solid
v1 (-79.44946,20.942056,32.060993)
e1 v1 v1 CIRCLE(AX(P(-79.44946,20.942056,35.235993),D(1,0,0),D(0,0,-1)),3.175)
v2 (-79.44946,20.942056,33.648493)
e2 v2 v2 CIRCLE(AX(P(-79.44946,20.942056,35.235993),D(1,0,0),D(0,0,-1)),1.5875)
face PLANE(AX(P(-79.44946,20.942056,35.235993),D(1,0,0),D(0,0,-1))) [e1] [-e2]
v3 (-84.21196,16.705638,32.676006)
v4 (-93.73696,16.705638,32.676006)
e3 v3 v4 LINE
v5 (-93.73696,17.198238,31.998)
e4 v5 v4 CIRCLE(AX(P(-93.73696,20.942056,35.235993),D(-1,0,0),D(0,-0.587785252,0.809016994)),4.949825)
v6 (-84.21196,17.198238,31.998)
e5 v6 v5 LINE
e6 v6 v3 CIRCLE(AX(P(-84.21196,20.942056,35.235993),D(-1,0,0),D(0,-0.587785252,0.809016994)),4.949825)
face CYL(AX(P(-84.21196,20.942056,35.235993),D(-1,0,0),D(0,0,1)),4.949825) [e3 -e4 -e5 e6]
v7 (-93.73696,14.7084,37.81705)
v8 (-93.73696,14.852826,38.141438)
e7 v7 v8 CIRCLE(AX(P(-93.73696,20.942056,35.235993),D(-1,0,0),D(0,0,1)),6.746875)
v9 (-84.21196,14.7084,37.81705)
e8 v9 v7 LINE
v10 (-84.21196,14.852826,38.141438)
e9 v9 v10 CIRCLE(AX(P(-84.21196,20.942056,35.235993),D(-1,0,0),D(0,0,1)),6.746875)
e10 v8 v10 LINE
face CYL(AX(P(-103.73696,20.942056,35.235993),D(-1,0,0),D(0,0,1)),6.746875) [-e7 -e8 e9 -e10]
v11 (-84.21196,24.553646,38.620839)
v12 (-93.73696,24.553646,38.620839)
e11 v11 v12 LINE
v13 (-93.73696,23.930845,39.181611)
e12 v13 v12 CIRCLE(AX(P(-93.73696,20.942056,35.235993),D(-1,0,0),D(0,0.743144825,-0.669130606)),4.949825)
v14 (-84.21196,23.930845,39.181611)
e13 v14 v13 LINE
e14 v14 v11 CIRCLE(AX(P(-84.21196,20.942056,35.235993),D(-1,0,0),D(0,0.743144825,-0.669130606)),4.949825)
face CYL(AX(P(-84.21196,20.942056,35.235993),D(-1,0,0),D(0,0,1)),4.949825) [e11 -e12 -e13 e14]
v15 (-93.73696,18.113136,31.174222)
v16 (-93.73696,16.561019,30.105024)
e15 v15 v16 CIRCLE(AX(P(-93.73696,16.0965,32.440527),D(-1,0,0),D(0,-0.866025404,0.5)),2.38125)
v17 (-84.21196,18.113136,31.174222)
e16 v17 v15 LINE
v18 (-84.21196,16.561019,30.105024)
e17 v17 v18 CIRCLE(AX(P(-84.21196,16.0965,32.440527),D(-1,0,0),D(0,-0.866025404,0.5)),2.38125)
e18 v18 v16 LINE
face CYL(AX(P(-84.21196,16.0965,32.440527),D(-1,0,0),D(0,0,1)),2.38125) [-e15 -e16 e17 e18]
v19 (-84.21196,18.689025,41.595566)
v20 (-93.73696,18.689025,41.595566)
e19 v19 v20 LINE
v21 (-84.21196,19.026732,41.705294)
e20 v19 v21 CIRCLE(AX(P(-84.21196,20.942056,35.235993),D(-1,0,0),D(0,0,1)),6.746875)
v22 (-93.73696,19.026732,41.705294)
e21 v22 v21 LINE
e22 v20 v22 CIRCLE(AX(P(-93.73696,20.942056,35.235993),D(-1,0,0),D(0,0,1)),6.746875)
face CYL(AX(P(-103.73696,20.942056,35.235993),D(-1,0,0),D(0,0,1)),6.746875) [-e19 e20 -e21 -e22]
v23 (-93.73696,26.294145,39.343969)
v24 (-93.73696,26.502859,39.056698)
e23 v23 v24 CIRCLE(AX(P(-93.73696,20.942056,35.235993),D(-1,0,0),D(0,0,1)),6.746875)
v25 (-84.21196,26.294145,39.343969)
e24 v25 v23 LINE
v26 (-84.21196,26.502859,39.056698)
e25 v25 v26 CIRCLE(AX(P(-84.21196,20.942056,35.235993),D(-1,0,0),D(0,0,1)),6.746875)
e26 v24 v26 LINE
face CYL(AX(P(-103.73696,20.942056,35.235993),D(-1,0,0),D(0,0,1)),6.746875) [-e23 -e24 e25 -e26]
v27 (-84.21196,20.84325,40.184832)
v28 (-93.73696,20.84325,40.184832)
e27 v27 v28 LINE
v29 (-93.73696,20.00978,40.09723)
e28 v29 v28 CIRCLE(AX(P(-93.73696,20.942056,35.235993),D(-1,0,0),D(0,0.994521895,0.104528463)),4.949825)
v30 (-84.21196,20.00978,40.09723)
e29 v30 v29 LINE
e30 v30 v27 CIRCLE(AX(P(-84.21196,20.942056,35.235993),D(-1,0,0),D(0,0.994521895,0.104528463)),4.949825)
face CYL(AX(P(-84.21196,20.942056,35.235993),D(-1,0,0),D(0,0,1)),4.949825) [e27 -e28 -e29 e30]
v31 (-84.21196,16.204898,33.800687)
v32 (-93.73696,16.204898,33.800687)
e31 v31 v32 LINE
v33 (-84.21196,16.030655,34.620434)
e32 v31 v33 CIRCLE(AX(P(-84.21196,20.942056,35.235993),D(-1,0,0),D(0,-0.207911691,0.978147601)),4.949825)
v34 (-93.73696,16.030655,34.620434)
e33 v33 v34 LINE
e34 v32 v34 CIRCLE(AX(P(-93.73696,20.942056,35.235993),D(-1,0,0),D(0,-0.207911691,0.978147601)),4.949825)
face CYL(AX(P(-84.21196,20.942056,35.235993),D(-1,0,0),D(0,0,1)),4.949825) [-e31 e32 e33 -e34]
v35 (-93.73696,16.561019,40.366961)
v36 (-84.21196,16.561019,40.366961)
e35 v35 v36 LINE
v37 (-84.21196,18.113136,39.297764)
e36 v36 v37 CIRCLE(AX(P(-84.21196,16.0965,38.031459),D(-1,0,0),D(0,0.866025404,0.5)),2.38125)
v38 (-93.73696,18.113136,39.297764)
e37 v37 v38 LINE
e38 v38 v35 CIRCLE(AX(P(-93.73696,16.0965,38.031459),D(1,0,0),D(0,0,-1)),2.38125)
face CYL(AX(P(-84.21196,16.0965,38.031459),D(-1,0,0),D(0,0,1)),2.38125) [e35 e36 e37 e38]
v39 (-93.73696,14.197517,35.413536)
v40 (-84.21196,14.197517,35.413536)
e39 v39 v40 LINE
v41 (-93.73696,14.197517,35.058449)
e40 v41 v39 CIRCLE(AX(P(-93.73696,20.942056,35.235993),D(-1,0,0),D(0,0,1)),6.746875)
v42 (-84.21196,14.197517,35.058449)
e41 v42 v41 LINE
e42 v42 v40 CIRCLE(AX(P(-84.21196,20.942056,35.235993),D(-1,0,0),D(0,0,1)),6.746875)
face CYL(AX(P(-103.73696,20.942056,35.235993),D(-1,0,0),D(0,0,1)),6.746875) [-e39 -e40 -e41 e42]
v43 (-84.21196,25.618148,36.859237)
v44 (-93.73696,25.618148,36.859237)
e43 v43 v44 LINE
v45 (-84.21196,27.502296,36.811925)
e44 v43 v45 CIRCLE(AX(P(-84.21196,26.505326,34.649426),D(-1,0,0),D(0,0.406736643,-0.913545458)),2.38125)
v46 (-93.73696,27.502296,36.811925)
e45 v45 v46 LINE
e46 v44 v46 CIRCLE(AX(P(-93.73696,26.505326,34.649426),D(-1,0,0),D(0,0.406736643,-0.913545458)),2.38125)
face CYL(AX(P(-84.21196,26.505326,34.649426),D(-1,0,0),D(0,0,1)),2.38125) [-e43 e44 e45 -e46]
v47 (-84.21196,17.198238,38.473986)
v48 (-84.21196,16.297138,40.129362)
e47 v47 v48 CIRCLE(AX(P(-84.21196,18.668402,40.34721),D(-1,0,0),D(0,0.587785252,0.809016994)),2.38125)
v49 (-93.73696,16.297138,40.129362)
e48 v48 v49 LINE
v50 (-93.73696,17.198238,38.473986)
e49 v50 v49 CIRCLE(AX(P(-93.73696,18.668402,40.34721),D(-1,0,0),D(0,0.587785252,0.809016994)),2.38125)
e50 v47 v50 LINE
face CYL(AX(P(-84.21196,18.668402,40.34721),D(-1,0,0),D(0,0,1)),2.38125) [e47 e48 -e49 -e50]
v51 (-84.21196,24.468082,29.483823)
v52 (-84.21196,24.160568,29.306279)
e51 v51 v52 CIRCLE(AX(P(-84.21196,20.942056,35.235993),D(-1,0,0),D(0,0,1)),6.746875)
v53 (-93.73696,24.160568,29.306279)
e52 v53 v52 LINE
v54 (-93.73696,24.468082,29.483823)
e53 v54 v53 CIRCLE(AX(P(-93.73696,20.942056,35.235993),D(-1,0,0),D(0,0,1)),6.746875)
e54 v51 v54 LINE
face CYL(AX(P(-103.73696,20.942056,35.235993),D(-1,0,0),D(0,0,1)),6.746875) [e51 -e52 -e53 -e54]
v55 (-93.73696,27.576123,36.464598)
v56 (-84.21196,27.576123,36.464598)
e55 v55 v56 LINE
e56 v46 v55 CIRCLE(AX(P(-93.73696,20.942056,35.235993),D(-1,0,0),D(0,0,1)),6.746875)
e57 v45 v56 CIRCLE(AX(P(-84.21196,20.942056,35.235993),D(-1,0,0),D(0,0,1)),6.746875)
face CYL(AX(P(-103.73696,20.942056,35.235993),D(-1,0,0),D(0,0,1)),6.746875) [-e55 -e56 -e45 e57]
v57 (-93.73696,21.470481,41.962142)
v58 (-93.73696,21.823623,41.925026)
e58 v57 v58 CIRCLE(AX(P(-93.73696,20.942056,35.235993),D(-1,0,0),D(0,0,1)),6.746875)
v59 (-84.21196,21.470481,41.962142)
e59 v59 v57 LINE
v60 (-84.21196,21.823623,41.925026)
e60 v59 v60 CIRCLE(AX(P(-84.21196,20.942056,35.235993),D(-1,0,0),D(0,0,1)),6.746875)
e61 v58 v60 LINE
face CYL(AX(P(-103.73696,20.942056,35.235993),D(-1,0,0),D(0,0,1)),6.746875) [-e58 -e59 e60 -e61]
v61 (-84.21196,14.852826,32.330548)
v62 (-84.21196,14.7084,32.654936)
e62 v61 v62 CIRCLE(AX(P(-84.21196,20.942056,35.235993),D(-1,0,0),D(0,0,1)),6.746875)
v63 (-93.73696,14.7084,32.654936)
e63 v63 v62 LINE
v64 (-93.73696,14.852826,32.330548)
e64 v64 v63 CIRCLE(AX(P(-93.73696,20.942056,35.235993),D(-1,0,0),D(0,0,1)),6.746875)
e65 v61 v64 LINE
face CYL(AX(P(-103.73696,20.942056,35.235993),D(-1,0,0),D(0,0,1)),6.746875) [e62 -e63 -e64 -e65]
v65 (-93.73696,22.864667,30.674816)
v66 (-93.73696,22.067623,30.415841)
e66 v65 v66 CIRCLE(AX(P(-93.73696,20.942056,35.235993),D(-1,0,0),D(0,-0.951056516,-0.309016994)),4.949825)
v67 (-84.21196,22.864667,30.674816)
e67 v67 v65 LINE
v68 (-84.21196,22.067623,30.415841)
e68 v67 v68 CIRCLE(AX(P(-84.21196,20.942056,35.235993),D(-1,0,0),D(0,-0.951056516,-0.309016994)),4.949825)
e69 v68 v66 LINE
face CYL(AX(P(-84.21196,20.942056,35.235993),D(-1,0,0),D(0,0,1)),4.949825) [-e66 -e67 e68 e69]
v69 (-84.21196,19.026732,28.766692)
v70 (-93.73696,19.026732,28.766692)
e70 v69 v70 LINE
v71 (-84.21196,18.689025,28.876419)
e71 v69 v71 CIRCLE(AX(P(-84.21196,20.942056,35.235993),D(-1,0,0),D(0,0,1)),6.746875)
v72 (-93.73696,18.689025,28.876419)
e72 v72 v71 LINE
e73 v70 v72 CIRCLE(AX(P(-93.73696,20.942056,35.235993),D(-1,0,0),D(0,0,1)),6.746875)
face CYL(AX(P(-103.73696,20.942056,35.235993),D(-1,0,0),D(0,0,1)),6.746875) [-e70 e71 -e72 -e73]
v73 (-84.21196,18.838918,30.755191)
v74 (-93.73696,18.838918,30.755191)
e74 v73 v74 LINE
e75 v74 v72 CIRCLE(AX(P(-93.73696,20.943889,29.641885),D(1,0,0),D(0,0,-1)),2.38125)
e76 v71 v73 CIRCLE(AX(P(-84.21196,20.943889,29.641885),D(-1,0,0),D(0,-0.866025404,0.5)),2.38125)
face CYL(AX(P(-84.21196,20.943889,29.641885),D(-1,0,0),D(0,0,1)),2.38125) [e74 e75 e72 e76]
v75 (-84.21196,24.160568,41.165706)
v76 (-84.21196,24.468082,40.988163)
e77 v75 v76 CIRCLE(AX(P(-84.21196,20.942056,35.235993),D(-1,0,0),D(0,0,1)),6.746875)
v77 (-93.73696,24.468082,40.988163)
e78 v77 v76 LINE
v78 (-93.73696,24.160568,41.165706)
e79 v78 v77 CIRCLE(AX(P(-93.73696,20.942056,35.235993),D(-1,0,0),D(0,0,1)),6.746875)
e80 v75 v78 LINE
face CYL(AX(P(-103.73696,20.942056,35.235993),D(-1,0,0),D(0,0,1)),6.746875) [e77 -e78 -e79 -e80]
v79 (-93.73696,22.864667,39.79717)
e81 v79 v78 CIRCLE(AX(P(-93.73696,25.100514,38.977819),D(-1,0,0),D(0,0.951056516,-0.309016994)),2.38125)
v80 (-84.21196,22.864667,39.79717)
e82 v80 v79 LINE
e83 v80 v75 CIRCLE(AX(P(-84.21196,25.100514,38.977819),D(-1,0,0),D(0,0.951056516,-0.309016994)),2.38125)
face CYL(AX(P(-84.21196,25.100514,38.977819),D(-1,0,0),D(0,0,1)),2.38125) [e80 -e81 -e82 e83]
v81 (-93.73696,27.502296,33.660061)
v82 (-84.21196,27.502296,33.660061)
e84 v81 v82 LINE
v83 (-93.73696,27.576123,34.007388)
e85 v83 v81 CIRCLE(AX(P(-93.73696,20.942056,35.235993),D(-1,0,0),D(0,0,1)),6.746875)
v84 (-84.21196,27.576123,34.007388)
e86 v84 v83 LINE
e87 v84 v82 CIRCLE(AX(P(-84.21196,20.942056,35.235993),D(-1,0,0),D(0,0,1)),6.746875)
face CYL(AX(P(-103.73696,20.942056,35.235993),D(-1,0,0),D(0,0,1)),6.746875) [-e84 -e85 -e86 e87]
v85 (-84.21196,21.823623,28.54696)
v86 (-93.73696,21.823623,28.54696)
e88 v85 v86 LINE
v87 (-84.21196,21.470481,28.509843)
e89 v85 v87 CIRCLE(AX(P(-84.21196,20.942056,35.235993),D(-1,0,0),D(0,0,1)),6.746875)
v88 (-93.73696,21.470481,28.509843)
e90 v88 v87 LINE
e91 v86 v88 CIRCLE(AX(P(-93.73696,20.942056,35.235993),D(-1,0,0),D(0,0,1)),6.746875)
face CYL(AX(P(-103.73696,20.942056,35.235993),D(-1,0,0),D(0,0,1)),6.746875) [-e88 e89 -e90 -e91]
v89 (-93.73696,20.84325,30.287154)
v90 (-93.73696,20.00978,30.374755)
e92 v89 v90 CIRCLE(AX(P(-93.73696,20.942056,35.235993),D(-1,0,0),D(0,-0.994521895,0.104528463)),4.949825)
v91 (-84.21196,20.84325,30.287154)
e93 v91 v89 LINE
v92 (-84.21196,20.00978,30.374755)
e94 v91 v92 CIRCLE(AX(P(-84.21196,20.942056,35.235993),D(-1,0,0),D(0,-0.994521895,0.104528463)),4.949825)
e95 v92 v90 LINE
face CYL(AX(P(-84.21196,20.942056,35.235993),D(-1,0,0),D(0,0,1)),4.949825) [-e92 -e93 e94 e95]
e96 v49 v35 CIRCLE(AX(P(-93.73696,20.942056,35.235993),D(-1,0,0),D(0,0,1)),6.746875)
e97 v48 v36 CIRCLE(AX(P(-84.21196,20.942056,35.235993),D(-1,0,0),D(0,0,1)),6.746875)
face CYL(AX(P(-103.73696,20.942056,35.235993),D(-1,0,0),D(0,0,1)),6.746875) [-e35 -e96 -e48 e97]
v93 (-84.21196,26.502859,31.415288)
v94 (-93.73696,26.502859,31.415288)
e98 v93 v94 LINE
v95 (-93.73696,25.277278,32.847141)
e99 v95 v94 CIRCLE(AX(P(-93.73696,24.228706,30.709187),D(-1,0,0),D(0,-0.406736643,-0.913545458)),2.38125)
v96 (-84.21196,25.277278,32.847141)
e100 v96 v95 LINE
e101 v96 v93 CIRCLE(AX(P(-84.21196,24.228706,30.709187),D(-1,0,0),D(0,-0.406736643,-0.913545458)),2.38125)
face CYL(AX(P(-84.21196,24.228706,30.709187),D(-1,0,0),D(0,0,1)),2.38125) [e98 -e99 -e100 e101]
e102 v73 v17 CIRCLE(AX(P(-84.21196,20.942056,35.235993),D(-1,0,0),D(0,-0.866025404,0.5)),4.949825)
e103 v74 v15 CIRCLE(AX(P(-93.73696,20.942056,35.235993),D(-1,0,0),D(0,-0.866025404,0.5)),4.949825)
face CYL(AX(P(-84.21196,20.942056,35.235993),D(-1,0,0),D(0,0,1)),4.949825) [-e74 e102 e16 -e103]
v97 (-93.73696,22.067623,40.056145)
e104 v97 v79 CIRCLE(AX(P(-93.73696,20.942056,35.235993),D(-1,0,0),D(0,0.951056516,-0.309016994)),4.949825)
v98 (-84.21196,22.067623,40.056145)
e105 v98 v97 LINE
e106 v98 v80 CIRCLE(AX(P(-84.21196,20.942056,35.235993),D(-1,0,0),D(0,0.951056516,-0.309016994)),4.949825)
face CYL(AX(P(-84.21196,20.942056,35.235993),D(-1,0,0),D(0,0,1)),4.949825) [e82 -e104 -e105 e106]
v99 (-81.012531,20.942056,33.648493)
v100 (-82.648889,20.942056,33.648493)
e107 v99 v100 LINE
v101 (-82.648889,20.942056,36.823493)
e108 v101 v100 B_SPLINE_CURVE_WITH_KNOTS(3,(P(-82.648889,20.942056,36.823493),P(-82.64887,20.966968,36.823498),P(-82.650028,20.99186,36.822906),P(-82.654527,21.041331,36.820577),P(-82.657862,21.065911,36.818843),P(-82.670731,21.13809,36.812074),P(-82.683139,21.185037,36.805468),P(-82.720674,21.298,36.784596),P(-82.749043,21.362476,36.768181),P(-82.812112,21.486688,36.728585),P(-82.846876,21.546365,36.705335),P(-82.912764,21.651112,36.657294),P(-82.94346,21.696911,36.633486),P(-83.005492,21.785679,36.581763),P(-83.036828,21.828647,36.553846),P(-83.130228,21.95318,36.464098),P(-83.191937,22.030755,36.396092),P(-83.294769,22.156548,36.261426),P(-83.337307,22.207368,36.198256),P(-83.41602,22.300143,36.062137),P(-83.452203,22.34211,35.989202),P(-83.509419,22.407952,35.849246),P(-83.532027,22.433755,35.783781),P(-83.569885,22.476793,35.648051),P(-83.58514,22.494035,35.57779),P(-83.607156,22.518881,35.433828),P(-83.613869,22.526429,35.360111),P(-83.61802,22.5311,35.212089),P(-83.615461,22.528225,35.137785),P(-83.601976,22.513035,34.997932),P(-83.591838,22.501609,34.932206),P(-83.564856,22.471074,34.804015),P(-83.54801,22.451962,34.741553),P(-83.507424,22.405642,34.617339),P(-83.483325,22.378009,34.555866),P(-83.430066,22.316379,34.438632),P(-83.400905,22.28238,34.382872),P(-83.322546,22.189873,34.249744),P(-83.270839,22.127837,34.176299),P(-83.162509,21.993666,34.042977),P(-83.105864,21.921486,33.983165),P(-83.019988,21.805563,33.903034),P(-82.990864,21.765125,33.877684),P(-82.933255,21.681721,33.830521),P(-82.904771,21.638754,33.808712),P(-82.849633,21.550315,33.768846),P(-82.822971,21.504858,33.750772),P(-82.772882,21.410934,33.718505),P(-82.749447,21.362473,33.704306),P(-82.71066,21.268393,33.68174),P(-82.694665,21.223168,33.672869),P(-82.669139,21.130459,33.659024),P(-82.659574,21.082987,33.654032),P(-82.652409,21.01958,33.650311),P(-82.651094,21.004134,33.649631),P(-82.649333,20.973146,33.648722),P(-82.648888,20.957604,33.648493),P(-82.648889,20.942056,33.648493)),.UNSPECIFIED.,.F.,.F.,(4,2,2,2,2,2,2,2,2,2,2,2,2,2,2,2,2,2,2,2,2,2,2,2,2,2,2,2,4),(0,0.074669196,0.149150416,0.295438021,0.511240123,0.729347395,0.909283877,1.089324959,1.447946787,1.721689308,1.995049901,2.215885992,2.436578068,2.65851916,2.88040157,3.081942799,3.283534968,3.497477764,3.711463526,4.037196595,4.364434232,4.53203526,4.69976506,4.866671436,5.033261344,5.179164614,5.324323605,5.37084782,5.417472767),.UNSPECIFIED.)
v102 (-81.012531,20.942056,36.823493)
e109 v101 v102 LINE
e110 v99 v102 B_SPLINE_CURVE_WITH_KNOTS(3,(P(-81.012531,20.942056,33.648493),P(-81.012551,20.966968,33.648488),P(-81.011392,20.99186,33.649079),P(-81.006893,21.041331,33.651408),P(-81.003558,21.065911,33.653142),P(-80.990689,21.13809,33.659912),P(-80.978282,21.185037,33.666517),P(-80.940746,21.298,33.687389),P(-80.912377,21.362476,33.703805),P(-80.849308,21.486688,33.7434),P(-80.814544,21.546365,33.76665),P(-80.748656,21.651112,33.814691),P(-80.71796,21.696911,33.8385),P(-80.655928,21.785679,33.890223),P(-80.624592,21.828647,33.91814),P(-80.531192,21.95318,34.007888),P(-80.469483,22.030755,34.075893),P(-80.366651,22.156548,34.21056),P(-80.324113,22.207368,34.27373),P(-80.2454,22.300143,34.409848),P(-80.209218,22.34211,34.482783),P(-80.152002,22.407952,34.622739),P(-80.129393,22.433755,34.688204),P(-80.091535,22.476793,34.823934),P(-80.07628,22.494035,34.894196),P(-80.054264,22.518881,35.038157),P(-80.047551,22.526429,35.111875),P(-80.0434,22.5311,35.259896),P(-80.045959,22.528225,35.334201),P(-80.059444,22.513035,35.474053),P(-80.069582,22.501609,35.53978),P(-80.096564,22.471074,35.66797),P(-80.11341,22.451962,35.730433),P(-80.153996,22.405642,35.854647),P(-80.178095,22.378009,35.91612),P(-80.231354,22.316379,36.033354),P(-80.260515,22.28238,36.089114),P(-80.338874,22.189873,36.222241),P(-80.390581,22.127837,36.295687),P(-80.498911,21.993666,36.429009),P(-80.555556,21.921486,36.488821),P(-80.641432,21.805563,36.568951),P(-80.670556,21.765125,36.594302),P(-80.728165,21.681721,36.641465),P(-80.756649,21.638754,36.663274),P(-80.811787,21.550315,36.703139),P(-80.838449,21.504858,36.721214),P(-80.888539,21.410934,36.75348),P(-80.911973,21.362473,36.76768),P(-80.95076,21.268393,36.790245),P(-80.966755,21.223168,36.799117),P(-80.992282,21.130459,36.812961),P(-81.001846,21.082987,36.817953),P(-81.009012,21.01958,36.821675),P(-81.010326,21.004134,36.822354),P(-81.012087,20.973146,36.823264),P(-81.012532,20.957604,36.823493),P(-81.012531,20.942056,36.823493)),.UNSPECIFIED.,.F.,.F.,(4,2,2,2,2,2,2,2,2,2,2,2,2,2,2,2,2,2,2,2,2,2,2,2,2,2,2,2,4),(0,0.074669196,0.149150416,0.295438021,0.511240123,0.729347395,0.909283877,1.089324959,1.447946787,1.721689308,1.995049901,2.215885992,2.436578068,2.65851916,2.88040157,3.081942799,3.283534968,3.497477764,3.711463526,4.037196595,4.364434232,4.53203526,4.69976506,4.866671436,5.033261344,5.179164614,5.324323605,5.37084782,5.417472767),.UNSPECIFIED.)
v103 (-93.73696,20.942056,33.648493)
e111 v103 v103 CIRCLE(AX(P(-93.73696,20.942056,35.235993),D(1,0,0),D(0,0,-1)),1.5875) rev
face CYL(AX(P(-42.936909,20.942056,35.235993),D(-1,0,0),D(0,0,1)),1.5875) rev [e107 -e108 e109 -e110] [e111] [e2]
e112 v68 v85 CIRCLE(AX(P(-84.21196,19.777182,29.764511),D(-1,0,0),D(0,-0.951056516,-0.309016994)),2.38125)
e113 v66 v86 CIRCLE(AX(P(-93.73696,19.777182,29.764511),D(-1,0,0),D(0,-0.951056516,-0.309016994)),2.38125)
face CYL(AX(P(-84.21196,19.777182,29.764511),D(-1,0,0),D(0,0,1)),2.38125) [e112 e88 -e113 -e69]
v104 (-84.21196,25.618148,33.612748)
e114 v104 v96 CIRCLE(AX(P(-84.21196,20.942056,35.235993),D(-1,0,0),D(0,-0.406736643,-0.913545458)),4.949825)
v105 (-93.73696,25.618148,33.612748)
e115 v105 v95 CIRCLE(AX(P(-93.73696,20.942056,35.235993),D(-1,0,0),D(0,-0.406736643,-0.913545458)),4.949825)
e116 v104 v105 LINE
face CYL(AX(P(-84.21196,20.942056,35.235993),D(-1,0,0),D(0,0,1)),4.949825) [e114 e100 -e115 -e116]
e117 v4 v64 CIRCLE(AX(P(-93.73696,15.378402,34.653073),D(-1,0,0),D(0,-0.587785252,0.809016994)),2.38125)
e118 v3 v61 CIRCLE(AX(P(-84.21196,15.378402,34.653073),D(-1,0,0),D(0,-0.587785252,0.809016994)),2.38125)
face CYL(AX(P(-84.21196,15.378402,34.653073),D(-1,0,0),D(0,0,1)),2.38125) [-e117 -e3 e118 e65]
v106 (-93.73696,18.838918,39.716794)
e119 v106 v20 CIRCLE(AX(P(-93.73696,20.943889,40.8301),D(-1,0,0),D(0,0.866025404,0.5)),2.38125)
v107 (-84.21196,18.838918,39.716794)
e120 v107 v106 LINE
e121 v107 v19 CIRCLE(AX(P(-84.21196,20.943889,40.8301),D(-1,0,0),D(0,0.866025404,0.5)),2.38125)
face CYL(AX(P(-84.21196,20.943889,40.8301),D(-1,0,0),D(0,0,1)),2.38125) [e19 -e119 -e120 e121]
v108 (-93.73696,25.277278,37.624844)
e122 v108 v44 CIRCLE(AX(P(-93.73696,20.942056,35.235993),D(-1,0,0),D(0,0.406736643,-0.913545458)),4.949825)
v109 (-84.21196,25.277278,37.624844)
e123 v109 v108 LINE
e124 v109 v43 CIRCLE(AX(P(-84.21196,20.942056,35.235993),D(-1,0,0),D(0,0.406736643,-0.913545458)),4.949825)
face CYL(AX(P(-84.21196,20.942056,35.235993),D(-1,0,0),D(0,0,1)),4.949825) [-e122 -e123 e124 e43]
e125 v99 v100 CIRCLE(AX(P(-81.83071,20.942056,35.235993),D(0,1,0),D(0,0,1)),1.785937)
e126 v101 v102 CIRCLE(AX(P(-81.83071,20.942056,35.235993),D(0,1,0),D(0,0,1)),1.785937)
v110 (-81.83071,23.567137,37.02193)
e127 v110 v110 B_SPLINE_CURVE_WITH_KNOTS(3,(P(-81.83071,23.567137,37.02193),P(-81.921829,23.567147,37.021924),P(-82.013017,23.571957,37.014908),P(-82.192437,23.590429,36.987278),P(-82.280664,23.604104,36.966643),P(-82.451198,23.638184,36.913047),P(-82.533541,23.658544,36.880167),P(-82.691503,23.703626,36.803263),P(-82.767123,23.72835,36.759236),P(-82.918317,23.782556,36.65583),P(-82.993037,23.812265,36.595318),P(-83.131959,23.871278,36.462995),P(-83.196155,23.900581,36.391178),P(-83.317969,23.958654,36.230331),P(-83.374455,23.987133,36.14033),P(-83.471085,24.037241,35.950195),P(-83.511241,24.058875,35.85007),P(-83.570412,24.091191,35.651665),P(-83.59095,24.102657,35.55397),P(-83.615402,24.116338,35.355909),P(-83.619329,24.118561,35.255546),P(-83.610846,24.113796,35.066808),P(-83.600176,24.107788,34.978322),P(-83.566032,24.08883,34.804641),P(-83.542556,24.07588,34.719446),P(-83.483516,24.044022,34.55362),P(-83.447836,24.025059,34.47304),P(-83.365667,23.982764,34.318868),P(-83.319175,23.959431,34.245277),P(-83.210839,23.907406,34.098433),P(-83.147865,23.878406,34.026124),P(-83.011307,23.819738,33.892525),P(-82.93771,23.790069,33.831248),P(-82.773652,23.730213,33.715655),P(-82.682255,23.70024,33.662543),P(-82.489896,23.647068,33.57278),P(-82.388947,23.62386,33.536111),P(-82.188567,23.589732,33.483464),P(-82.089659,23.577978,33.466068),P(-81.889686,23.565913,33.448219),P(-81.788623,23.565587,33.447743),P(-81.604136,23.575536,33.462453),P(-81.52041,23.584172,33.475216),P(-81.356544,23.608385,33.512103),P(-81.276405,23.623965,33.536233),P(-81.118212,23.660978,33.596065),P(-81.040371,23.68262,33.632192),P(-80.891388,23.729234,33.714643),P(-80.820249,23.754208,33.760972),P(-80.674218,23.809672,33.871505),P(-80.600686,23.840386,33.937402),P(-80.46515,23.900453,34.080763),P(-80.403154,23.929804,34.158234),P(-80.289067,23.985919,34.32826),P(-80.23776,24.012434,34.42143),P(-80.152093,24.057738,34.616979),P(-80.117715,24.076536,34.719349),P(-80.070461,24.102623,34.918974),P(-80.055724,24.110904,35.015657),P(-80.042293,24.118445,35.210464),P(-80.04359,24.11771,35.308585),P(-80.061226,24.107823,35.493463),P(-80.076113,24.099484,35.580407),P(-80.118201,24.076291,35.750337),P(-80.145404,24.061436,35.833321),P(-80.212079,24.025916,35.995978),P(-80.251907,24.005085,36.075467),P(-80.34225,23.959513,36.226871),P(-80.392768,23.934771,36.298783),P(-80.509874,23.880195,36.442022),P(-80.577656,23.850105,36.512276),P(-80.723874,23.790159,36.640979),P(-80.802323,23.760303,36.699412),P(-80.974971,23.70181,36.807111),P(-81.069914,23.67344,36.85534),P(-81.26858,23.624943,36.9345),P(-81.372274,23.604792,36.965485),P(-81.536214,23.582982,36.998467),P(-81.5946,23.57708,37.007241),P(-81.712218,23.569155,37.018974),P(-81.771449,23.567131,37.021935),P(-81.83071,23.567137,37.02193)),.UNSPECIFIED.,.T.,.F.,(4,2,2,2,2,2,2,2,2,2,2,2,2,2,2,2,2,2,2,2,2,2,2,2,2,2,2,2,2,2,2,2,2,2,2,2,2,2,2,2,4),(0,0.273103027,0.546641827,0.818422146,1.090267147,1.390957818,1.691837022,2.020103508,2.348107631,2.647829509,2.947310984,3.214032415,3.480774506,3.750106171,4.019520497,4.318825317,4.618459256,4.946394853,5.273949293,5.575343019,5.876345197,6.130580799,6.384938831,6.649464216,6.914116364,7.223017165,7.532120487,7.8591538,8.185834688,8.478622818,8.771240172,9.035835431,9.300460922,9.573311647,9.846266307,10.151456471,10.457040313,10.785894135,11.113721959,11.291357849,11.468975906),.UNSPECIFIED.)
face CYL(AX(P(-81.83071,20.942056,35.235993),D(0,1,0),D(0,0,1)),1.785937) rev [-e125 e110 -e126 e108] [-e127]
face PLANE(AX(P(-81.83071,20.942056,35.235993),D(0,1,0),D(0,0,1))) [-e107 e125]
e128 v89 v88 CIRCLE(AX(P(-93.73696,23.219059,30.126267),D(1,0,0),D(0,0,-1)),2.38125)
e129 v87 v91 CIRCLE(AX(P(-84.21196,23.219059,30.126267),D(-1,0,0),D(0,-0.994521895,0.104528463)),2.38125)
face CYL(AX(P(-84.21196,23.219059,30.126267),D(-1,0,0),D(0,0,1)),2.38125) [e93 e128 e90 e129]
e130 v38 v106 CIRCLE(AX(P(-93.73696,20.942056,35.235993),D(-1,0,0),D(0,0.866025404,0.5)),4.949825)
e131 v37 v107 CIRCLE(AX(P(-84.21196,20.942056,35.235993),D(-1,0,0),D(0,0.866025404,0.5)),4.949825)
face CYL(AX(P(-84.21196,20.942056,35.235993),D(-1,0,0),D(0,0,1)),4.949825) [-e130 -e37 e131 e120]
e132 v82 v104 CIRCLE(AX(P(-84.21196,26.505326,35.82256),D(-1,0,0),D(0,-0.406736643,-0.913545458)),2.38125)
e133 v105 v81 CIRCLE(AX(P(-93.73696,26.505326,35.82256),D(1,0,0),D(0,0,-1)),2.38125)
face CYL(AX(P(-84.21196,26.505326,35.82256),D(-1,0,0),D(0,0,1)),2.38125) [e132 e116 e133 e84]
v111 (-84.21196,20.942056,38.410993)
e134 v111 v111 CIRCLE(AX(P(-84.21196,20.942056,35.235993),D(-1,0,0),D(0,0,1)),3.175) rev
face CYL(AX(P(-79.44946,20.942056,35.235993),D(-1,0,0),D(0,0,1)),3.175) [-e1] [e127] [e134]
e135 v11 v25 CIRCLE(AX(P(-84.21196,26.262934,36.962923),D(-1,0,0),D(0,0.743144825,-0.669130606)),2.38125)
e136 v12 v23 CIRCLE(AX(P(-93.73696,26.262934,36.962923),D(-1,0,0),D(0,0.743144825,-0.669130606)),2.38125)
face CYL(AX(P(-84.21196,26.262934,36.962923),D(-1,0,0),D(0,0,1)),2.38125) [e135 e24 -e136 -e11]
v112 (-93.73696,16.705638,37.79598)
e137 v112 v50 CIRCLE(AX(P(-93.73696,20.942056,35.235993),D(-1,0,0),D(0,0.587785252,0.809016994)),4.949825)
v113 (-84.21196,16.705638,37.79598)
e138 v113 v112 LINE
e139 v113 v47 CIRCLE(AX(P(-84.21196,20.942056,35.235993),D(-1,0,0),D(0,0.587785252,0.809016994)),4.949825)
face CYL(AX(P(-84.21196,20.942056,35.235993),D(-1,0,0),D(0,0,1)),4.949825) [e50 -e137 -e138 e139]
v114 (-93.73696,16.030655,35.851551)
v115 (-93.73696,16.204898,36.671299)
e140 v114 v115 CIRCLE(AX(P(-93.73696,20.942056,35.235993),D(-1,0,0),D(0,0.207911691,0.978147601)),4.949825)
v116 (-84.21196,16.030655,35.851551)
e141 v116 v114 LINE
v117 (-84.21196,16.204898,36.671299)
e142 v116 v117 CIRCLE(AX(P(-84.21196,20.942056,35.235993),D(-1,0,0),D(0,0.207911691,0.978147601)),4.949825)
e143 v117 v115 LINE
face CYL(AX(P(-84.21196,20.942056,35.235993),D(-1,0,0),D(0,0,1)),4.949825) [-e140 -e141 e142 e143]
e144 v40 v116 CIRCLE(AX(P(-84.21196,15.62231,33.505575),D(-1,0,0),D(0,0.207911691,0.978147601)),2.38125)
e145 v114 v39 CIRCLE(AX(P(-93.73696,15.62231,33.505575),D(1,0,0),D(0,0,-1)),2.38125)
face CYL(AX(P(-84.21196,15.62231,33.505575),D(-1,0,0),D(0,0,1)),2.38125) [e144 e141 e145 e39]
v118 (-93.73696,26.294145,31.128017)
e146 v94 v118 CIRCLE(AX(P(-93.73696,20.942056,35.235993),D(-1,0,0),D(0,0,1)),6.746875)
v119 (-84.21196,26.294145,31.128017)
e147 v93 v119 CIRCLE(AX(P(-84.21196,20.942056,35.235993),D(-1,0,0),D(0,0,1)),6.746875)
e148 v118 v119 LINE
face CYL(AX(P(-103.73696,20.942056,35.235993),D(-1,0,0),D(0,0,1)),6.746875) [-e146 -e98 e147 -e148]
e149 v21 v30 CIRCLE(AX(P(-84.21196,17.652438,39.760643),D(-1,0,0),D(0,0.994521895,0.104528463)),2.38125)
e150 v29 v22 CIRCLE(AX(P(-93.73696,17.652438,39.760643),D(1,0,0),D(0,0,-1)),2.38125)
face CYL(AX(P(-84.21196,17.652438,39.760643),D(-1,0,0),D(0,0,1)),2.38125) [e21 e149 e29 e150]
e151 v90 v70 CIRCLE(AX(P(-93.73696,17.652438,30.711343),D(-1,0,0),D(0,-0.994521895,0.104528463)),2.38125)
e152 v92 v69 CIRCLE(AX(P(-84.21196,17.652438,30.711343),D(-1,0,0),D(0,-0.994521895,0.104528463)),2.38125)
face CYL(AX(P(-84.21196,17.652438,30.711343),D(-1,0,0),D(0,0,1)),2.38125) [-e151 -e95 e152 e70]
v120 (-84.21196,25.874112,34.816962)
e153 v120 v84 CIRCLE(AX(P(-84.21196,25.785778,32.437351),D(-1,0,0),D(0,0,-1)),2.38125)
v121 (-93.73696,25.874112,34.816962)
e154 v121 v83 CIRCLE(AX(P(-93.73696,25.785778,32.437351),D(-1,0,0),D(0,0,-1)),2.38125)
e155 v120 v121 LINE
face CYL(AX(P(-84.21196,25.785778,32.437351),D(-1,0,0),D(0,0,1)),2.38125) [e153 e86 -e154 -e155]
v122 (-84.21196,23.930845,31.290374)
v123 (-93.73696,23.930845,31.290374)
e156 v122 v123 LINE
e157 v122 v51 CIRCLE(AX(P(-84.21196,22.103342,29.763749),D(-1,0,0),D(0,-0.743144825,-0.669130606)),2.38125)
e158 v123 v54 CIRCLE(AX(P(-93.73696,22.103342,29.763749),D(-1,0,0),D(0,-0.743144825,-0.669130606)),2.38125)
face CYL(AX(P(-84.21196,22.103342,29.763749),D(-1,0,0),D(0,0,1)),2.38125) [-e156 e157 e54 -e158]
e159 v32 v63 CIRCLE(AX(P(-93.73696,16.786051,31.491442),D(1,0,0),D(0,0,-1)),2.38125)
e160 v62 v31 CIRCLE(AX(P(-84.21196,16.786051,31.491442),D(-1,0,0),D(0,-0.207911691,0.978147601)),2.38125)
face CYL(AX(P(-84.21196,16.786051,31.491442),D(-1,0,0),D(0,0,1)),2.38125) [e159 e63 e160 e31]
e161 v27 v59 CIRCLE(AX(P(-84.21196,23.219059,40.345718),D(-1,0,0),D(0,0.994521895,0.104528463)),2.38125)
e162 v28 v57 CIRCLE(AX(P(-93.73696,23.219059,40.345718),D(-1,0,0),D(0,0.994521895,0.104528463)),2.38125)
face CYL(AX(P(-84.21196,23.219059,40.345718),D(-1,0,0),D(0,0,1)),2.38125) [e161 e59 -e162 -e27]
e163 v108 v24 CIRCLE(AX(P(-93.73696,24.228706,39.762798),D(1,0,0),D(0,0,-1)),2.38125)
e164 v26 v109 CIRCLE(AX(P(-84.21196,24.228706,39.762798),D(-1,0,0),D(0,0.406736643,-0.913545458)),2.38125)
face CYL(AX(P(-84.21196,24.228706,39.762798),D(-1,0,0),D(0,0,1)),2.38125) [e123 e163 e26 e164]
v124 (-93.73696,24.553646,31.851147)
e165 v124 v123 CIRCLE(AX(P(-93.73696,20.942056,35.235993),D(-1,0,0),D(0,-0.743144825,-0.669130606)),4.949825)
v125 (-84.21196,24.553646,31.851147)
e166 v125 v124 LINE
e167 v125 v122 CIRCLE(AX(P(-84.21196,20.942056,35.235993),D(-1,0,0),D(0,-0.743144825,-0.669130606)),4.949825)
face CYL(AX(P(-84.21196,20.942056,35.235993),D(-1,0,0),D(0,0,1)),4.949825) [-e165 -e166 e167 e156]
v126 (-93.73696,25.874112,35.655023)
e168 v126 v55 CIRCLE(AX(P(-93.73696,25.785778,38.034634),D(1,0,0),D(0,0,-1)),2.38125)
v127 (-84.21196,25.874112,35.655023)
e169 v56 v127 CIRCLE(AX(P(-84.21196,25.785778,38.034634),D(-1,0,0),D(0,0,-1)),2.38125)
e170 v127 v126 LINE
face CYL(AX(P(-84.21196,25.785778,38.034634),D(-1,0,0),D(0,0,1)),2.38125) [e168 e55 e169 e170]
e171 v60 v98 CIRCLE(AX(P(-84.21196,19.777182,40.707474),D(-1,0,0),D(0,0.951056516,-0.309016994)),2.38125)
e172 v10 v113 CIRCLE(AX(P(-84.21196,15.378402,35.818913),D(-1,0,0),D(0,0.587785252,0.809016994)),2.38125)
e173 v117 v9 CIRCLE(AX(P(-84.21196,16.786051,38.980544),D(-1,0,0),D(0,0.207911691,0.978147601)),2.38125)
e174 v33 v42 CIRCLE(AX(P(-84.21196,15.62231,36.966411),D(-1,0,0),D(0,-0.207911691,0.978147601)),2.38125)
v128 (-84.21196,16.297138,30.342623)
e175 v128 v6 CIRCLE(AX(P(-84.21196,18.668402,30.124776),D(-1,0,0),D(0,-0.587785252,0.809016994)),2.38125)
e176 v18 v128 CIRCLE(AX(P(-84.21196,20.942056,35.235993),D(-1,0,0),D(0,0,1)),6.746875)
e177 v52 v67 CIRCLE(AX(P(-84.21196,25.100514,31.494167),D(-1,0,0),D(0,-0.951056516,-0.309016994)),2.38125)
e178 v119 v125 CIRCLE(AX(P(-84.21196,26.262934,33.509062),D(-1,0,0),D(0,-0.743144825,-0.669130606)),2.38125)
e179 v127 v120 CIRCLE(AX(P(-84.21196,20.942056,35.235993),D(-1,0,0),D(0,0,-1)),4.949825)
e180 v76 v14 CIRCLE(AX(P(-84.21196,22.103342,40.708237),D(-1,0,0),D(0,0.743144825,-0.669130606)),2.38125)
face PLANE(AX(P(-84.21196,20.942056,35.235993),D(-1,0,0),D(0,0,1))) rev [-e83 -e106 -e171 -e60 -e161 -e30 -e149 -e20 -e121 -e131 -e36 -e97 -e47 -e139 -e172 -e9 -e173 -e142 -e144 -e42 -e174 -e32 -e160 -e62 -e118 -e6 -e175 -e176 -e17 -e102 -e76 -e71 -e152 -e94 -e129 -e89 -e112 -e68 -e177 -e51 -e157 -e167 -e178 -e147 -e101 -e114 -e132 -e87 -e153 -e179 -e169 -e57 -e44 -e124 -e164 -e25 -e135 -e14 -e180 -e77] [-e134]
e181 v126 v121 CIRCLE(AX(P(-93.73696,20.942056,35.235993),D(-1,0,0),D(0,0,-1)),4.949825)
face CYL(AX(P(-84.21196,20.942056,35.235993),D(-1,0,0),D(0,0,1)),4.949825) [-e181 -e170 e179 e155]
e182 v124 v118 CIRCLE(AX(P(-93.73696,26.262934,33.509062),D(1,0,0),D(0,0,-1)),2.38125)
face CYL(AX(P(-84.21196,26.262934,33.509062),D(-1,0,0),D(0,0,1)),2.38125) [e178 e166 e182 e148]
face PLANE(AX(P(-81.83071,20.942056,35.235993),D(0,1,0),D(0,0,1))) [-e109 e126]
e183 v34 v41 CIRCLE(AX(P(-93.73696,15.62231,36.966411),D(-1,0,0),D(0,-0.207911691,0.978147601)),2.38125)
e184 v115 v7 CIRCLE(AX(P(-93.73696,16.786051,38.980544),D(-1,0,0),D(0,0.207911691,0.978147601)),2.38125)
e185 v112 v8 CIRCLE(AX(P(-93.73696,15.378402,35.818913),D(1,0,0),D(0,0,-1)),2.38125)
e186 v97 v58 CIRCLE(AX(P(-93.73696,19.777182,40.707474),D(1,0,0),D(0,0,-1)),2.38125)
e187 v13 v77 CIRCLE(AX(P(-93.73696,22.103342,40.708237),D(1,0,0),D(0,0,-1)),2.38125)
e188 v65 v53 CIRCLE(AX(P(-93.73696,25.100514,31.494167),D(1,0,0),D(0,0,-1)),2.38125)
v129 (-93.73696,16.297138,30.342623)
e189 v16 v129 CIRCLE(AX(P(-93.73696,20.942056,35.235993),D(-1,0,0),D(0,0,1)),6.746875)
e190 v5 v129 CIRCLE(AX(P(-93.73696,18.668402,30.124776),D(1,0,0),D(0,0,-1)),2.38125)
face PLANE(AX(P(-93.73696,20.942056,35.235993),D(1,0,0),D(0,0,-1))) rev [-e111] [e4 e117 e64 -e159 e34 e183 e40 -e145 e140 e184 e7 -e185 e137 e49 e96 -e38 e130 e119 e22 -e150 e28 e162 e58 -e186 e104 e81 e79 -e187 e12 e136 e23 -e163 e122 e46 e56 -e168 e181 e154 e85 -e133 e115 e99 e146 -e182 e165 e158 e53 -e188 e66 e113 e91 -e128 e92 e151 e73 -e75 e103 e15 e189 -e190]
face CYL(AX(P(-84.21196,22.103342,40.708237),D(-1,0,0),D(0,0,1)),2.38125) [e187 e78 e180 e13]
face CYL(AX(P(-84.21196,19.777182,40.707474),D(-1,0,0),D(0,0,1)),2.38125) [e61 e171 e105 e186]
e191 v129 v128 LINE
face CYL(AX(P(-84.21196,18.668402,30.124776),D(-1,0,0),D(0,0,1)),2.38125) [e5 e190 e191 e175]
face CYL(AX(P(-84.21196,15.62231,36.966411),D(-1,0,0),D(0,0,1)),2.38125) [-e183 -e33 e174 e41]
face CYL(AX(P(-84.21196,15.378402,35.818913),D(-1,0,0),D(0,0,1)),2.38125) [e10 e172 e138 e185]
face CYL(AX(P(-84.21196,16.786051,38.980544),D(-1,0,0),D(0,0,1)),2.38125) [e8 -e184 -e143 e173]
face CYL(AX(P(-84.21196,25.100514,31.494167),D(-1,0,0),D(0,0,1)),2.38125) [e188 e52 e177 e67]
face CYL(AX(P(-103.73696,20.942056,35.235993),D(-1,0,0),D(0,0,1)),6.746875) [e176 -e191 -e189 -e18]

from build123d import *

# Parameters (mm, degrees)
SPUR_START             = -93.736960043
SPUR_GEAR_AI_OUTLINE_R = 1.5875
SPUR_GEAR_AI_DEPTH     = 9.525
SKETCH1_R              = 3.175
SKETCH1_R_2            = 1.5875
BOSS_EXTRUDE1_DEPTH    = 4.7625
SKETCH2_R              = 1.7859375
CUT_EXTRUDE1_DEPTH     = 3.175


# Read off the part's stored shape, not the designer's step: spur gear_ai
with BuildPart() as part:
    # spur gear_ai outline → spur gear_ai (new body)
    with BuildSketch(Plane.YZ.offset(SPUR_START)):
        with BuildLine():
            ThreePointArc((26.294144563, 31.128016902), (26.400392113, 31.270279151), (26.502859253, 31.415288028))
            ThreePointArc((26.502859253, 31.415288028), (26.037760207, 32.257629699), (25.277278274, 32.847141228))
            ThreePointArc((25.277278274, 32.847141228), (25.463945724, 33.222717571), (25.618148436, 33.612748146))
            ThreePointArc((25.618148436, 33.612748146), (26.565102615, 33.44206014), (27.502296476, 33.660060783))
            ThreePointArc((27.502296476, 33.660060783), (27.541495173, 33.833238586), (27.576123139, 34.007387928))
            ThreePointArc((27.576123139, 34.007387928), (26.808622795, 34.58773251), (25.874112039, 34.816962221))
            ThreePointArc((25.874112039, 34.816962221), (25.891880579, 35.235992775), (25.874112039, 35.655023329))
            ThreePointArc((25.874112039, 35.655023329), (26.808622795, 35.88425304), (27.576123139, 36.464597623))
            ThreePointArc((27.576123139, 36.464597623), (27.541495173, 36.638746964), (27.502296476, 36.811924767))
            ThreePointArc((27.502296476, 36.811924767), (26.565102615, 37.029925411), (25.618148436, 36.859237404))
            ThreePointArc((25.618148436, 36.859237404), (25.463945724, 37.249267979), (25.277278274, 37.624844322))
            ThreePointArc((25.277278274, 37.624844322), (26.037760207, 38.214355851), (26.502859253, 39.056697522))
            ThreePointArc((26.502859253, 39.056697522), (26.400392113, 39.201706399), (26.294144563, 39.343968648))
            ThreePointArc((26.294144563, 39.343968648), (25.349306519, 39.161931061), (24.553645896, 38.620838844))
            ThreePointArc((24.553645896, 38.620838844), (24.254134982, 38.914429611), (23.930845121, 39.181611181))
            ThreePointArc((23.930845121, 39.181611181), (24.385803996, 40.029472629), (24.468081893, 40.988162861))
            ThreePointArc((24.468081893, 40.988162861), (24.315493079, 41.078957921), (24.160567843, 41.165706181))
            ThreePointArc((24.160567843, 41.165706181), (23.371456696, 40.615106316), (22.864666581, 39.797169648))
            ThreePointArc((22.864666581, 39.797169648), (22.471635623, 39.943556096), (22.067623104, 40.056144773))
            ThreePointArc((22.067623104, 40.056144773), (22.138392398, 41.015753193), (21.823622551, 41.925025735))
            ThreePointArc((21.823622551, 41.925025735), (21.647296055, 41.945907688), (21.470481113, 41.962142396))
            ThreePointArc((21.470481113, 41.962142396), (20.97354135, 41.138183972), (20.843250357, 40.184831534))
            ThreePointArc((20.843250357, 40.184831534), (20.424657978, 40.158702116), (20.009780236, 40.097230294))
            ThreePointArc((20.009780236, 40.097230294), (19.684123296, 41.002660673), (19.02673227, 41.705294043))
            ThreePointArc((19.02673227, 41.705294043), (18.857156545, 41.652652209), (18.689024808, 41.595566237))
            ThreePointArc((18.689024808, 41.595566237), (18.570181828, 40.64071915), (18.838918453, 39.716794239))
            ThreePointArc((18.838918453, 39.716794239), (18.467143079, 39.522666969), (18.113136244, 39.297763686))
            ThreePointArc((18.113136244, 39.297763686), (17.447362113, 39.992458885), (16.56101879, 40.366961389))
            ThreePointArc((16.56101879, 40.366961389), (16.427515019, 40.24989802), (16.297137991, 40.129362051))
            ThreePointArc((16.297137991, 40.129362051), (16.576940826, 39.208728037), (17.198238065, 38.473985665))
            ThreePointArc((17.198238065, 38.473985665), (16.937563035, 38.145426912), (16.705638106, 37.795979987))
            ThreePointArc((16.705638106, 37.795979987), (15.81486518, 38.159820895), (14.852826371, 38.141437649))
            ThreePointArc((14.852826371, 38.141437649), (14.778478569, 37.980194064), (14.708399623, 37.817049862))
            ThreePointArc((14.708399623, 37.817049862), (15.33846782, 37.089814907), (16.204897737, 36.671298704))
            ThreePointArc((16.204897737, 36.671298704), (16.100396131, 36.26511926), (16.030655035, 35.851551242))
            ThreePointArc((16.030655035, 35.851551242), (15.068906044, 35.821626462), (14.197517, 35.413536095))
            ThreePointArc((14.197517, 35.413536095), (14.195180579, 35.235992775), (14.197517, 35.058449455))
            ThreePointArc((14.197517, 35.058449455), (15.068906044, 34.650359089), (16.030655035, 34.620434308))
            ThreePointArc((16.030655035, 34.620434308), (16.100396131, 34.20686629), (16.204897737, 33.800686847))
            ThreePointArc((16.204897737, 33.800686847), (15.33846782, 33.382170643), (14.708399623, 32.654935688))
            ThreePointArc((14.708399623, 32.654935688), (14.778478569, 32.491791486), (14.852826371, 32.330547901))
            ThreePointArc((14.852826371, 32.330547901), (15.81486518, 32.312164655), (16.705638106, 32.676005564))
            ThreePointArc((16.705638106, 32.676005564), (16.937563035, 32.326558639), (17.198238065, 31.997999885))
            ThreePointArc((17.198238065, 31.997999885), (16.576940826, 31.263257513), (16.297137991, 30.3426235))
            ThreePointArc((16.297137991, 30.3426235), (16.427515019, 30.222087531), (16.56101879, 30.105024161))
            ThreePointArc((16.56101879, 30.105024161), (17.447362114, 30.479526665), (18.113136244, 31.174221865))
            ThreePointArc((18.113136244, 31.174221865), (18.467143079, 30.949318581), (18.838918453, 30.755191311))
            ThreePointArc((18.838918453, 30.755191311), (18.570181828, 29.831266401), (18.689024808, 28.876419314))
            ThreePointArc((18.689024808, 28.876419314), (18.857156545, 28.819333342), (19.02673227, 28.766691508))
            ThreePointArc((19.02673227, 28.766691508), (19.684123296, 29.469324877), (20.009780236, 30.374755256))
            ThreePointArc((20.009780236, 30.374755256), (20.424657978, 30.313283434), (20.843250357, 30.287154017))
            ThreePointArc((20.843250357, 30.287154017), (20.97354135, 29.333801579), (21.470481113, 28.509843154))
            ThreePointArc((21.470481113, 28.509843154), (21.647296055, 28.526077862), (21.823622551, 28.546959815))
            ThreePointArc((21.823622551, 28.546959815), (22.138392398, 29.456232358), (22.067623104, 30.415840778))
            ThreePointArc((22.067623104, 30.415840778), (22.471635623, 30.528429454), (22.864666581, 30.674815902))
            ThreePointArc((22.864666581, 30.674815902), (23.371456696, 29.856879235), (24.160567843, 29.30627937))
            ThreePointArc((24.160567843, 29.30627937), (24.315493079, 29.393027629), (24.468081893, 29.483822689))
            ThreePointArc((24.468081893, 29.483822689), (24.385803996, 30.442512921), (23.930845121, 31.290374369))
            ThreePointArc((23.930845121, 31.290374369), (24.254134982, 31.557555939), (24.553645896, 31.851146706))
            ThreePointArc((24.553645896, 31.851146706), (25.349306519, 31.310054489), (26.294144563, 31.128016902))
        make_face()
        with Locations((20.942055579, 35.235992775)):
            Circle(SPUR_GEAR_AI_OUTLINE_R, mode=Mode.SUBTRACT)
    extrude(amount=SPUR_GEAR_AI_DEPTH)

    # Sketch1 → Boss-Extrude1 (add)
    with BuildSketch(Plane(origin=(-84.211960043, 0, 0), x_dir=(0, 0, -1), z_dir=(1, 0, 0))):
        with Locations(Location((-35.235992775, 20.942055579, 0), (0, 0, 180))):
            Circle(SKETCH1_R)
        with Locations((-35.235992775, 20.942055579)):
            Circle(SKETCH1_R_2, mode=Mode.SUBTRACT)
    extrude(amount=BOSS_EXTRUDE1_DEPTH)

    # Sketch2 → Cut-Extrude1 (cut)
    with BuildSketch(Plane(origin=(0, 24.117055579, 0), x_dir=(1, 0, 0), z_dir=(0, 1, 0))):
        with Locations(Location((-81.830710043, -35.235992775, 0), (0, 0, 270))):
            Circle(SKETCH2_R)
    extrude(amount=-CUT_EXTRUDE1_DEPTH, mode=Mode.SUBTRACT)


solid = part.part
